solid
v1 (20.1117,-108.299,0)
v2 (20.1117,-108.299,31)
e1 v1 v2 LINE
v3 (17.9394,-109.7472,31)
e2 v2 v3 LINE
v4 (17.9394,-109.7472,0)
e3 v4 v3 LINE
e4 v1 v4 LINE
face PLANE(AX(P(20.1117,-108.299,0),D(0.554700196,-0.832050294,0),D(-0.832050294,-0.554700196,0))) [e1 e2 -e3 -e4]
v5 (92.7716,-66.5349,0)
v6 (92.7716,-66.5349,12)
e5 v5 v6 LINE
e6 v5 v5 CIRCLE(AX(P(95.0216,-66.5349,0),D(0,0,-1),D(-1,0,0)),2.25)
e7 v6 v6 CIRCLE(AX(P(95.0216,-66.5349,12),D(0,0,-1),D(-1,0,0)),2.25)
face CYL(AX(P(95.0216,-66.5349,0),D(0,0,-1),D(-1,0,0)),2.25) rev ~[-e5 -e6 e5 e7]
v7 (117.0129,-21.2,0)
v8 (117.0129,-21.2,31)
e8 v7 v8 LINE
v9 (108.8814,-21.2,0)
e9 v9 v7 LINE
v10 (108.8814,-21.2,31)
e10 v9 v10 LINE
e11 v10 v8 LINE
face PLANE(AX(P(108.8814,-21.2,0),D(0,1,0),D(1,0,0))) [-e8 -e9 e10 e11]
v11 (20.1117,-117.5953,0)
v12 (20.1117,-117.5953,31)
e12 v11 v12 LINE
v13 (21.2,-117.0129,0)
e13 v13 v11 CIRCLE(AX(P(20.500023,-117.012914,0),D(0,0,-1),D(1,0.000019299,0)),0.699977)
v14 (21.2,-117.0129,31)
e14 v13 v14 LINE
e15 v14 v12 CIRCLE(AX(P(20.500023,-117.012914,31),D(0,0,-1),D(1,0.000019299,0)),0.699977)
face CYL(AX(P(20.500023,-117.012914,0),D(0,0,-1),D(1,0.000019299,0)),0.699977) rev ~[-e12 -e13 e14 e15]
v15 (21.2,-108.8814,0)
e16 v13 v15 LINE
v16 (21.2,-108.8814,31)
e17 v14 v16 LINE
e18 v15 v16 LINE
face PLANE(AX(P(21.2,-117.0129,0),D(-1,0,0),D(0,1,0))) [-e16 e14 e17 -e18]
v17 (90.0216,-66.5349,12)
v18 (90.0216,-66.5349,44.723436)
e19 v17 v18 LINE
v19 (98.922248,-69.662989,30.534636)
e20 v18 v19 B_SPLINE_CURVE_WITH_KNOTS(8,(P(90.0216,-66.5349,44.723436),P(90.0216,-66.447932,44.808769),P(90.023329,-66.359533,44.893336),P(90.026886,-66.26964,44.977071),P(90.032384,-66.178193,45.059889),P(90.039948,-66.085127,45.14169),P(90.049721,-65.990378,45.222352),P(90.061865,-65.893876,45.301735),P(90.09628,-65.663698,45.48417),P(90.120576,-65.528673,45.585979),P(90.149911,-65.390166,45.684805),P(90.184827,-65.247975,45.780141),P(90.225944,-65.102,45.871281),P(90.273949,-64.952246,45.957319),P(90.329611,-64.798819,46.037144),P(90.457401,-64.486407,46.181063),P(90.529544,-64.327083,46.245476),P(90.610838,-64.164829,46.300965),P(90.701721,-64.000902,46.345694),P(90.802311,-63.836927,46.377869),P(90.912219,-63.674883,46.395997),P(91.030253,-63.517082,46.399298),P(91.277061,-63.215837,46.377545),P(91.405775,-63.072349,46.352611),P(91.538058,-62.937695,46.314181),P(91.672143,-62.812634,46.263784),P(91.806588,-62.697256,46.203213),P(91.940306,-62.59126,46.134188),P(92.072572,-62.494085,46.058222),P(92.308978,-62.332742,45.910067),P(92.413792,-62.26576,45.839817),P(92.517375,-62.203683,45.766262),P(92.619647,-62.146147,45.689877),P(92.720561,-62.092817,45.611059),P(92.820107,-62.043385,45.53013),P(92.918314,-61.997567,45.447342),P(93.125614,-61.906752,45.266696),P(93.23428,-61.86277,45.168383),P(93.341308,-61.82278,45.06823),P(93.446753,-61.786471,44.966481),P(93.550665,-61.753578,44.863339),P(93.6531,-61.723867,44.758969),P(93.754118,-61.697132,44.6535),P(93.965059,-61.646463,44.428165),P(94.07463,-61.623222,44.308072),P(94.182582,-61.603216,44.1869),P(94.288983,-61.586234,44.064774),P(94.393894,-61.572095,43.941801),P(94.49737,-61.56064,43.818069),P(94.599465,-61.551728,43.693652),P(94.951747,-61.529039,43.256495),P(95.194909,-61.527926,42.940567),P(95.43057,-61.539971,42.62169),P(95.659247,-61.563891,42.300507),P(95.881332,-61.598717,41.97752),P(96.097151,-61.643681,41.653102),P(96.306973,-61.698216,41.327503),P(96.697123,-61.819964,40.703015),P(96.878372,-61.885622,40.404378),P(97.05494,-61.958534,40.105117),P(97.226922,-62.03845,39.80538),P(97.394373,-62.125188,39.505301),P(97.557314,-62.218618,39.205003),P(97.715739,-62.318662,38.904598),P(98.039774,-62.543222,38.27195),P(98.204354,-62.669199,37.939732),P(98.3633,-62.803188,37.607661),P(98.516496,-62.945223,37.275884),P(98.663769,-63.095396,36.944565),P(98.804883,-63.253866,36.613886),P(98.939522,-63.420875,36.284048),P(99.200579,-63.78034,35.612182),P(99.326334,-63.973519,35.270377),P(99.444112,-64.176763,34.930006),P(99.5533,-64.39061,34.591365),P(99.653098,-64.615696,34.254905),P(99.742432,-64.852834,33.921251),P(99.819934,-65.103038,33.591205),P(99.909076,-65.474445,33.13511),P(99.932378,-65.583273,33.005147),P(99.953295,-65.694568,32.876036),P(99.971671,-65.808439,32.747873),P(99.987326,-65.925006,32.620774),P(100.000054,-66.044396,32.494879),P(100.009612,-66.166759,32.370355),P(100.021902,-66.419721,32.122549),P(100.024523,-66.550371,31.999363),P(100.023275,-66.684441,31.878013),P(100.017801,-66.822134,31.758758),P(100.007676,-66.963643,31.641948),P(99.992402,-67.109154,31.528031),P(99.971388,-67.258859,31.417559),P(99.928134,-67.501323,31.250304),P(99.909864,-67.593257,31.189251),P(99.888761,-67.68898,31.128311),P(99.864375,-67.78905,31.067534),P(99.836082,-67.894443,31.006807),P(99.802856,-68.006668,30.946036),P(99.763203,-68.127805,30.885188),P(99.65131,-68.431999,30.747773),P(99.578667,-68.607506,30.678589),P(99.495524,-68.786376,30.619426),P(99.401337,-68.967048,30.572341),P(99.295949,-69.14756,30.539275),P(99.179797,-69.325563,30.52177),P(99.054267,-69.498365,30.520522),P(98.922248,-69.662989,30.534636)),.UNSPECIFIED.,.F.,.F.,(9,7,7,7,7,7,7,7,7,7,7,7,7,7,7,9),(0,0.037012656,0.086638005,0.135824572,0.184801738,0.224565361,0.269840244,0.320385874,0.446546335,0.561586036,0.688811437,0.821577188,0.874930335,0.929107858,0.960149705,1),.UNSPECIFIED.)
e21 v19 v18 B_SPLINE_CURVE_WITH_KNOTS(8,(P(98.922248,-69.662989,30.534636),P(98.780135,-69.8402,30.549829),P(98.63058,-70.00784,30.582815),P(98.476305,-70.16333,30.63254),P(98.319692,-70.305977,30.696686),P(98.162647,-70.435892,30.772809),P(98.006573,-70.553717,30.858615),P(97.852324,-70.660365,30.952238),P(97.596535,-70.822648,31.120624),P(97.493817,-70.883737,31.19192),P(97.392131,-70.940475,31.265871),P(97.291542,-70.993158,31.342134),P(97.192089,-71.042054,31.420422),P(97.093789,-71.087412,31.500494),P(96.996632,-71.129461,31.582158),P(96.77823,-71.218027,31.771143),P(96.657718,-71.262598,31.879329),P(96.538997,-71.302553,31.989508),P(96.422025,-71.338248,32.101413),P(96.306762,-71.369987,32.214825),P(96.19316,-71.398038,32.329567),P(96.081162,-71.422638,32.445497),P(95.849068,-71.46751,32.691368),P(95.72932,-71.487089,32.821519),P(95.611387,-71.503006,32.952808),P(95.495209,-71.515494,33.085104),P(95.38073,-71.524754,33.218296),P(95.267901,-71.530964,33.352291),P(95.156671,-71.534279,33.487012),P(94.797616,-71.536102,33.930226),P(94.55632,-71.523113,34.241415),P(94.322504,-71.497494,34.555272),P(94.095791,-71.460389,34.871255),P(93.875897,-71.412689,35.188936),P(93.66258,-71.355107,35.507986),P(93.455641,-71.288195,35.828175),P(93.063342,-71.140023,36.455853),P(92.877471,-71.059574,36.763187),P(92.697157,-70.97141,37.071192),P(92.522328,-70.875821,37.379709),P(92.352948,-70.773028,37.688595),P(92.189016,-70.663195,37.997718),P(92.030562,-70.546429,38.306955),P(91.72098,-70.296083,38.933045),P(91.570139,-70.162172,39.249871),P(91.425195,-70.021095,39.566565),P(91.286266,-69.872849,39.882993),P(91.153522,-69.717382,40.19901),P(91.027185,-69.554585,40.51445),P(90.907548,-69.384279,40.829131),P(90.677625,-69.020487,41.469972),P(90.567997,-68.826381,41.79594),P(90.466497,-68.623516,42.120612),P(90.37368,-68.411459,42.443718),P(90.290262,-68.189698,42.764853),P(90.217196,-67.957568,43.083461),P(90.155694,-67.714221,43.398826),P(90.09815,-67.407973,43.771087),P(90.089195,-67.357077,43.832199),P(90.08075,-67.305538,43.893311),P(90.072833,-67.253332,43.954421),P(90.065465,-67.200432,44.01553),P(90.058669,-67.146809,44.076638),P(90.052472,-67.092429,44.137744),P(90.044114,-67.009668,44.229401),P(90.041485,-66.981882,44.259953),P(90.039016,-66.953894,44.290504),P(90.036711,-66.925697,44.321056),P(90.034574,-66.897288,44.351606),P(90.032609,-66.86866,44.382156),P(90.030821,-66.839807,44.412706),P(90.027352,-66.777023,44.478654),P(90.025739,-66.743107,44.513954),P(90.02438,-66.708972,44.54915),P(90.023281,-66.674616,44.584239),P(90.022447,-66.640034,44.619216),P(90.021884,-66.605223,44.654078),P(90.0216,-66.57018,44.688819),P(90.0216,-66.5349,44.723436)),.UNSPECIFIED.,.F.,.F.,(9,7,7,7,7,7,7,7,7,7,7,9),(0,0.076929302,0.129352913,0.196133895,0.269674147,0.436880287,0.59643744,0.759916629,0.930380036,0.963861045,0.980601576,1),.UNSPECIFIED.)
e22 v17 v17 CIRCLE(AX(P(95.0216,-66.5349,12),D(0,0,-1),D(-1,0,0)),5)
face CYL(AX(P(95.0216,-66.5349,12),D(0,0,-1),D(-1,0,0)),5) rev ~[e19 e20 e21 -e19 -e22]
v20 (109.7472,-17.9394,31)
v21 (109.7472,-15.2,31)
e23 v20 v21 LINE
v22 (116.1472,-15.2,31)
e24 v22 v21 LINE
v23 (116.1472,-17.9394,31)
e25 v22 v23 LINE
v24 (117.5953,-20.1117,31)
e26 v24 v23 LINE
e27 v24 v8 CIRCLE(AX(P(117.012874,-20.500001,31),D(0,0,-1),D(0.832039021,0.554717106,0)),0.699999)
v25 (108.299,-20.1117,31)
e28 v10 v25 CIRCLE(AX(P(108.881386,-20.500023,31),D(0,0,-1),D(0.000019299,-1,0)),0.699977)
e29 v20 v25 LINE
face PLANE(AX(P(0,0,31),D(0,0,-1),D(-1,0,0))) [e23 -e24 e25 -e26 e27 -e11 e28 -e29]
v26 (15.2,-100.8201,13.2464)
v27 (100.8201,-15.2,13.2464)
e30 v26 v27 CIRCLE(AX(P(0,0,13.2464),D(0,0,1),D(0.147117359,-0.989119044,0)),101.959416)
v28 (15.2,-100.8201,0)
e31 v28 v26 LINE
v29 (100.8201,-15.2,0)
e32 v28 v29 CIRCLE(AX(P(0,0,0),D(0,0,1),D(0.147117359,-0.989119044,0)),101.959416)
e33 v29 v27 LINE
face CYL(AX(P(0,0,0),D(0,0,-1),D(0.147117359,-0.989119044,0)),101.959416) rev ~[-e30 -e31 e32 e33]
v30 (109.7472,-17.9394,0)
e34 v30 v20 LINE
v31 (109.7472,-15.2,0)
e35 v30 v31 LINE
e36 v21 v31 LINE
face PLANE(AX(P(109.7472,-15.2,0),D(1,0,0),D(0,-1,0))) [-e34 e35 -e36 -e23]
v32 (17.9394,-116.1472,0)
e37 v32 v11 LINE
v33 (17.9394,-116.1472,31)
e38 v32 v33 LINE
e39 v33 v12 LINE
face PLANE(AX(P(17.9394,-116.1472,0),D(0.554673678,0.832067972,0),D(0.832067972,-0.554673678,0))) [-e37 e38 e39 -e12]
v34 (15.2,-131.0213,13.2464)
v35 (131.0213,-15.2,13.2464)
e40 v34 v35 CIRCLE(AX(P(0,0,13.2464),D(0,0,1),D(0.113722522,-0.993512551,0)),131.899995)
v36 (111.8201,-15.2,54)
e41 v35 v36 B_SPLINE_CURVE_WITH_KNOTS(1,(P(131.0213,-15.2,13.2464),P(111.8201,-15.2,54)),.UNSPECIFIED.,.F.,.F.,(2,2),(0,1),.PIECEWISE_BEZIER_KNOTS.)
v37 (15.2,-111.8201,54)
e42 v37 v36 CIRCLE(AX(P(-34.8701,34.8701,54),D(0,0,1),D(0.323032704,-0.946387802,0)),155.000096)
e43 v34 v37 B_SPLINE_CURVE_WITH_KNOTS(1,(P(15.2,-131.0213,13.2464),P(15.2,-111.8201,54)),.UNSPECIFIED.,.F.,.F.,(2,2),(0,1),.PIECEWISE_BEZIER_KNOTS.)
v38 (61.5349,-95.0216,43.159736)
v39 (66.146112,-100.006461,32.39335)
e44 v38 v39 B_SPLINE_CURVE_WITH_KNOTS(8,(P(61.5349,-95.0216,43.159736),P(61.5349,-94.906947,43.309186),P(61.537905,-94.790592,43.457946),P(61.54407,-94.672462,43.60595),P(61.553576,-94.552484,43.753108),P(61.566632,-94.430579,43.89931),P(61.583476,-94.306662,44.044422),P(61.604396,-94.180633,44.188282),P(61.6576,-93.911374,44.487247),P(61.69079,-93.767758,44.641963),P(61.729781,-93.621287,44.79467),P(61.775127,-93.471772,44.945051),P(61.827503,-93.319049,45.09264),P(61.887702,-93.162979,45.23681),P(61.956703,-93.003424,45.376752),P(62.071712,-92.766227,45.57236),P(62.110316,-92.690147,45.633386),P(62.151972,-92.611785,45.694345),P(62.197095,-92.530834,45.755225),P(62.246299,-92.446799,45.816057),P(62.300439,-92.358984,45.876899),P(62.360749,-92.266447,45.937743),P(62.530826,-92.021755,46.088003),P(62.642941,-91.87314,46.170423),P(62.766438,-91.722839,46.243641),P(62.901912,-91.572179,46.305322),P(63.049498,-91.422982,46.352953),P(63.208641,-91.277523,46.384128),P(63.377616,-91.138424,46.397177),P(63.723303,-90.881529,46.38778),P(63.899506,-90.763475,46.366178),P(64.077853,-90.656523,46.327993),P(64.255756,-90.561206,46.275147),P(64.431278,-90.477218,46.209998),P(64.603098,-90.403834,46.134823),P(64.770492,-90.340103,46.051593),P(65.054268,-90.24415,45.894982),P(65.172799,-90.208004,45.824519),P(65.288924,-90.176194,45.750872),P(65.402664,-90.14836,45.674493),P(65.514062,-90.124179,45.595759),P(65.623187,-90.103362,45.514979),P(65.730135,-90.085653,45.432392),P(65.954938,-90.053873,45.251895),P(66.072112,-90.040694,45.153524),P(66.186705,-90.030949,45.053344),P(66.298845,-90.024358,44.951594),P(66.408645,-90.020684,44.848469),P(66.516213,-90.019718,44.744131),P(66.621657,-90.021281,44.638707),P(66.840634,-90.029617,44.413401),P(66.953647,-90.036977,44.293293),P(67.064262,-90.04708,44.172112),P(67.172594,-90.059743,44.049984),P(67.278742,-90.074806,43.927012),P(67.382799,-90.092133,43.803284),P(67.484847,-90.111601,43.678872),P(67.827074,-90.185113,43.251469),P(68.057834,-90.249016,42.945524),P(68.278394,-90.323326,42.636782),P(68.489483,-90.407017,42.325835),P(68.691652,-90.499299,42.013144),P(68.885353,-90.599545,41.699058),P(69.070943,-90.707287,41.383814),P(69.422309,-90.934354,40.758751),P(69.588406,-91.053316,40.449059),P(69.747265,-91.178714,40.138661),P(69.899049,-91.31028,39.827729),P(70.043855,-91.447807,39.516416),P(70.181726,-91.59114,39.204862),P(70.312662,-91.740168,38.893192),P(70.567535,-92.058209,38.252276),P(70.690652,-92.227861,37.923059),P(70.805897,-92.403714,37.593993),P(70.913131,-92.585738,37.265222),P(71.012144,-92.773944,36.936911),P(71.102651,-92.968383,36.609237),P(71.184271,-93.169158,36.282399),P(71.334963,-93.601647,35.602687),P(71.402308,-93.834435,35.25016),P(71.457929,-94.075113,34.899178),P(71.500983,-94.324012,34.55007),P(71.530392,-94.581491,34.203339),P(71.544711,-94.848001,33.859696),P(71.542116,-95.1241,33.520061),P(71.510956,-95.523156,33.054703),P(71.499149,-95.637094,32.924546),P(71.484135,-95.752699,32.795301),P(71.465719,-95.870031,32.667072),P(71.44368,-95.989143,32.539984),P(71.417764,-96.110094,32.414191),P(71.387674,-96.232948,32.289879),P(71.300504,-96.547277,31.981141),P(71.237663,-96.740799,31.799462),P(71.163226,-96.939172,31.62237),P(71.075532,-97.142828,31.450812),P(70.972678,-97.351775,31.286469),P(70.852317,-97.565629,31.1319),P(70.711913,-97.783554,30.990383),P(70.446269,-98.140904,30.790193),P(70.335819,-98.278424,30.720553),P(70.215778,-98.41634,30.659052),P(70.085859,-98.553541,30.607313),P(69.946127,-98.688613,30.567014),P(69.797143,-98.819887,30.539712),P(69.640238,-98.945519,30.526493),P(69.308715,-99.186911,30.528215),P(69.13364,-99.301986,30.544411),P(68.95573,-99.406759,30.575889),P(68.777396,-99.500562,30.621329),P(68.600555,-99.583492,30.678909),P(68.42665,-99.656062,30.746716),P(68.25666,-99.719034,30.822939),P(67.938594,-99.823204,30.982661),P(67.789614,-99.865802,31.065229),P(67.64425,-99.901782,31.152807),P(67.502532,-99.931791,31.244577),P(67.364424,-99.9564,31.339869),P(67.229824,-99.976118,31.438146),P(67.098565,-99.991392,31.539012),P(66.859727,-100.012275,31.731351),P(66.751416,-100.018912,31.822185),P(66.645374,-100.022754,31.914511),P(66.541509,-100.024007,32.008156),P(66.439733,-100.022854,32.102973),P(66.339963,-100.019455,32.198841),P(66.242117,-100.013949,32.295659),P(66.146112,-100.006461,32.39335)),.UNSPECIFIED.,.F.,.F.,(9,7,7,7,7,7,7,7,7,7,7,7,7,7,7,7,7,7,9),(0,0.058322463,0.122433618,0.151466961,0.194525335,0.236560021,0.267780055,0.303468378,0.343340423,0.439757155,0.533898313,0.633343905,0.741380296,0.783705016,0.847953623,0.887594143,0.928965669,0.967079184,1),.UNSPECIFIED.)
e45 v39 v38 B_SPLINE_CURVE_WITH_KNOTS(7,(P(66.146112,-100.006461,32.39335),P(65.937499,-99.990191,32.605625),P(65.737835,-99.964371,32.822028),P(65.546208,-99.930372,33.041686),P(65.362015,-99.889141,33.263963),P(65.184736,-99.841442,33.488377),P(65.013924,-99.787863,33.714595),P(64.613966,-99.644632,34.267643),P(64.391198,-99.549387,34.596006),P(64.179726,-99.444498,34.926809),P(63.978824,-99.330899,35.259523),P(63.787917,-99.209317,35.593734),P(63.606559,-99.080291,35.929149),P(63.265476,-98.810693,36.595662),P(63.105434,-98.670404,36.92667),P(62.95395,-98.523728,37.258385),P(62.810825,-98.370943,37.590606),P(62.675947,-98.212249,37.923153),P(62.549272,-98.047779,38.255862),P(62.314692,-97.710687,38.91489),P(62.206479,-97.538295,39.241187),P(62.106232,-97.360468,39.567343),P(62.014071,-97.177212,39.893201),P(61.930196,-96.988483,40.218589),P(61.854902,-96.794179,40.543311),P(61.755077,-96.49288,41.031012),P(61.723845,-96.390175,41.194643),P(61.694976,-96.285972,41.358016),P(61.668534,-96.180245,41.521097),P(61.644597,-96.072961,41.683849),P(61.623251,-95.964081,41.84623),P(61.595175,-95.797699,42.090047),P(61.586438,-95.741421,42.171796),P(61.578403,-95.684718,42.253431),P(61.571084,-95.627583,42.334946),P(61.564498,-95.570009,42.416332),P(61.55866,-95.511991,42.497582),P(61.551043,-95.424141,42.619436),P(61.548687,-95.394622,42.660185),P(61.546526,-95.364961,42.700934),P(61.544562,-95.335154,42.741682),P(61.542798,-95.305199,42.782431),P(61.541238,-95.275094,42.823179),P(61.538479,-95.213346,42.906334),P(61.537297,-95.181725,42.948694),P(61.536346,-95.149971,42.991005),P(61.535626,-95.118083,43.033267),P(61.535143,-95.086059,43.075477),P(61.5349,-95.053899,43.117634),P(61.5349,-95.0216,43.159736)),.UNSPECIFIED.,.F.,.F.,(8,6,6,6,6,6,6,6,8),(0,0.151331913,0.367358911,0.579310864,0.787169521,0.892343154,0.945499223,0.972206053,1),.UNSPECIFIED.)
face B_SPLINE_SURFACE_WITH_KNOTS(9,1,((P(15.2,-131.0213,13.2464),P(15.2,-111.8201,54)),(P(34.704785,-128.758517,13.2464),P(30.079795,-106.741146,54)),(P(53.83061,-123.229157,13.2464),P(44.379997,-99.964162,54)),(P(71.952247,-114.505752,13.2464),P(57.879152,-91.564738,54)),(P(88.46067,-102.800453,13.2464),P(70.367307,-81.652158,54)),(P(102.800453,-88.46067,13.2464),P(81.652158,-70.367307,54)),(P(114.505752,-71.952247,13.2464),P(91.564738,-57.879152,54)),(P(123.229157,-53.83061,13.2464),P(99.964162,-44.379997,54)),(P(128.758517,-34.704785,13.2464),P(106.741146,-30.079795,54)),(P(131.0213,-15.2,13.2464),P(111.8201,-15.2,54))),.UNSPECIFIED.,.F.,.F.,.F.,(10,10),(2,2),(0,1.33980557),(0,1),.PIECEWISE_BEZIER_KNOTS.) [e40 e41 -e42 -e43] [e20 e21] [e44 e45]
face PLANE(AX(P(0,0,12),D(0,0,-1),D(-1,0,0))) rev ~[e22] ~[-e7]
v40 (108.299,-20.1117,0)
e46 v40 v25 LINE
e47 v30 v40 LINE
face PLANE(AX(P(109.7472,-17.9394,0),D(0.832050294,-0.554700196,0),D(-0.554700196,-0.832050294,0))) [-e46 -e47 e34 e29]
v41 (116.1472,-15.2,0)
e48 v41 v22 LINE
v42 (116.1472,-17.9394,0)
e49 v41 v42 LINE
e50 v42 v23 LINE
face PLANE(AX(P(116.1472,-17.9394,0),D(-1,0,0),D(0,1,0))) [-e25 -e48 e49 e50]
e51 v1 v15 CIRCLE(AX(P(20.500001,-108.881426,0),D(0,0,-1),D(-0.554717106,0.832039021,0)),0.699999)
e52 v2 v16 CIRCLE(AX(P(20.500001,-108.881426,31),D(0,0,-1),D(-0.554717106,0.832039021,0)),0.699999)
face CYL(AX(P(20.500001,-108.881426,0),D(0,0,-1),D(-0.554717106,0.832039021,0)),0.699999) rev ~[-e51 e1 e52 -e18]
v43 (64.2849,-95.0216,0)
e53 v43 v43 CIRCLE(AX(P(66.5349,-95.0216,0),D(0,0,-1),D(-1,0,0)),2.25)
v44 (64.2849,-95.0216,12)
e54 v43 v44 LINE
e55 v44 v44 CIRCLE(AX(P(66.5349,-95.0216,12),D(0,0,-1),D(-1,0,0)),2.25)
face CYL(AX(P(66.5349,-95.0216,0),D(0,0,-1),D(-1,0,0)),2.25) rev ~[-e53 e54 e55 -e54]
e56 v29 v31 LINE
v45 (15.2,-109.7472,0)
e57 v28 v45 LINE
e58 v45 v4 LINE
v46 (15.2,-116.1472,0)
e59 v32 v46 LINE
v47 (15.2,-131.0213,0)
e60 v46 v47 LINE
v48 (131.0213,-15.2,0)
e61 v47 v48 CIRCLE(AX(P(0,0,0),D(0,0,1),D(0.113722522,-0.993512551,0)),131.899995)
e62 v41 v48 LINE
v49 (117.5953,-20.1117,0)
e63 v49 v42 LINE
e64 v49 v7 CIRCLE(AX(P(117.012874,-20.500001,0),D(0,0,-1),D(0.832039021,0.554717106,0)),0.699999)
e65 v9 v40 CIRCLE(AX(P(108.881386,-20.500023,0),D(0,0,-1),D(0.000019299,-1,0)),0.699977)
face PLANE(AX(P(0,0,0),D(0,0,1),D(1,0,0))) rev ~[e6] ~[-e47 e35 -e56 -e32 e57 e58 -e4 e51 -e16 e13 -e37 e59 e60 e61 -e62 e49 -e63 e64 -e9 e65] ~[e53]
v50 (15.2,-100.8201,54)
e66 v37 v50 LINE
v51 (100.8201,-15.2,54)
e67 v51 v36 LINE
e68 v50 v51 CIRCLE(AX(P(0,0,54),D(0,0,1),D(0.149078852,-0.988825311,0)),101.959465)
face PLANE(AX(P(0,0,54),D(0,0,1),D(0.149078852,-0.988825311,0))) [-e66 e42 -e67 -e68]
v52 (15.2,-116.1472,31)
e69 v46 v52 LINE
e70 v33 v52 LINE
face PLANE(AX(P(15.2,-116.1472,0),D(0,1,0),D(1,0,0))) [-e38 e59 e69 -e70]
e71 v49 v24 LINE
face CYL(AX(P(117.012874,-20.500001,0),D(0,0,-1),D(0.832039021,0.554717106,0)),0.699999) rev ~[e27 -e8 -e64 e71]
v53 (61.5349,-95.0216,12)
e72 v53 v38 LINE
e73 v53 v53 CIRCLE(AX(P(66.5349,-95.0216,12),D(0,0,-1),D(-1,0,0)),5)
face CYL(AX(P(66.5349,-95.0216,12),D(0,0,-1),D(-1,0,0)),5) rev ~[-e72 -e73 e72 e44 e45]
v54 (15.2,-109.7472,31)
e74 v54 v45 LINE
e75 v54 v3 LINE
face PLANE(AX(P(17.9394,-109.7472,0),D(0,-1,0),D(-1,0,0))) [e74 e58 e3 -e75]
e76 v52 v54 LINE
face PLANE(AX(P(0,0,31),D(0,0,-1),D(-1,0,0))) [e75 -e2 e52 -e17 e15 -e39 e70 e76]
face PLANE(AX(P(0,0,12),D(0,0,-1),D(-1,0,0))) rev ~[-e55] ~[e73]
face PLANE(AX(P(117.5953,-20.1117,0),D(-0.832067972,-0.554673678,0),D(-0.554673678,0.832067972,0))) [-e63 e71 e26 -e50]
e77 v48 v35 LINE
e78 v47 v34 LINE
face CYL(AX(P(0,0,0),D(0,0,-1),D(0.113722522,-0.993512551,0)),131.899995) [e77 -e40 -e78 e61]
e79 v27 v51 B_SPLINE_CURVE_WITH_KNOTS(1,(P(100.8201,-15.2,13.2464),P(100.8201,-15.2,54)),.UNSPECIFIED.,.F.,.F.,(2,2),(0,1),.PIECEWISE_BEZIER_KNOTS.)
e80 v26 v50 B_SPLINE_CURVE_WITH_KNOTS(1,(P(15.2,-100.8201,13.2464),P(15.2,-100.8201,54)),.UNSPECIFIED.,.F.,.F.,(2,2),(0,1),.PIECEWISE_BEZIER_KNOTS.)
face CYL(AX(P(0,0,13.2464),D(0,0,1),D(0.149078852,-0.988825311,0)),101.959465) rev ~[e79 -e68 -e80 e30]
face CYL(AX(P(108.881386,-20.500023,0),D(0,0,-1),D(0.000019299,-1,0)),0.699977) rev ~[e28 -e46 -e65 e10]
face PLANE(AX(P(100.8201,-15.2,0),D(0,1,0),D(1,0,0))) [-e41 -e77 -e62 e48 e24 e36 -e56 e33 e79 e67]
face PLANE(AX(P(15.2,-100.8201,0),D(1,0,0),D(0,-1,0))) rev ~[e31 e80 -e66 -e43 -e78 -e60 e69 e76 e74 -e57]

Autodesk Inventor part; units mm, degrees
ref_plane "YZ Plane" through (0, 0, 0) normal (1, 0, 0) x (0, 1, 0)
ref_plane "Płaszczyzna konstrukcyjna1" through (0, 0, 0) normal (0, 0, 1) x (1, 0, 0)
sketch "Szkic1" plane through (0, 0, 0) normal (0, 0, 1) x (1, 0, 0)
  arc A0 (15, -100.85) -> (100.85, -15) centre (0, 0) ccw projected
  arc A1 (15, -131.0443) -> (131.0443, -15) centre (0, 0) ccw projected
  line L0 (100.85, -15) -> (111.85, -15) projected
  line L1 (15, -100.85) -> (15, -111.85) projected
  line L2 (15.2, -100.8201) -> (15.2, -131.0213)
  line L3 (100.8201, -15.2) -> (131.0213, -15.2)
  point P0 (0, 0)
  dimension "d0" = 0.2
  dimension "d1" = 0.2
extrude "Wyciągnięcie proste1" add sketch "Szkic1" along normal up to surface (13.2464 mm away)
sketch "Szkic2" plane through (100.8201, -15.2, 13.2464) normal (0, 0, 1) x (1, 0, 0)
  line L0 (0, 0) -> (30.2012, 0) projected
  arc A0 (-85.6201, -85.6201) -> (0, 0) centre (-100.8201, 15.2) ccw projected
  line L1 (-85.6201, -115.8213) -> (-85.6201, -85.6201) projected
  arc A1 (-85.6201, -115.8213) -> (30.2012, 0) centre (-100.8201, 15.2) ccw projected
ref_plane "Płaszczyzna konstrukcyjna2" through (15, -111.85, 54) normal (0, 0, 1) x (1, 0, 0)
sketch "Szkic3" plane through (15, -111.85, 54) normal (0, 0, 1) x (1, 0, 0)
  arc A0 (0.2, 11.0299) -> (85.8201, 96.65) centre (-15, 111.85) ccw projected
  line L0 (0.2, -19.1713) -> (0.2, 11.0299) projected
  line L1 (85.8201, 96.65) -> (116.0213, 96.65) projected
  line L2 (0.2, 11.0299) -> (0.2, 0.0299)
  line L3 (0.2, -19.1713) -> (0.2, 11.0299) projected
  line L4 (85.8201, 96.65) -> (116.0213, 96.65) projected
  line L5 (85.8201, 96.65) -> (96.8201, 96.65)
  arc A1 (0.2, 0.0299) -> (96.8201, 96.65) centre (-49.8701, 146.7201) ccw
  point P0 (-15, 111.85)
  dimension "d4" = 11
  dimension "d5" = 11
  dimension "d6" = 155
loft "Wyciągnięcie złożone1" add profiles "Szkic2", "Szkic3"
sketch "Szkic7" plane through (0, 0, 0) normal (0, 0, -1) x (-1, 0, 0)
  line L0 (-109.9472, -18) -> (-109.9472, -15) projected
  line L1 (-108.4654, -20.2226) -> (-109.9472, -18) projected
  line L2 (-115.9472, -15) -> (-115.9472, -18) projected
  line L3 (-115.9472, -18) -> (-117.4289, -20.2226) projected
  arc A0 (-117.4289, -20.2226) -> (-117.0129, -21) centre (-117.0129, -20.5) ccw projected
  line L4 (-117.0129, -21) -> (-108.8814, -21) projected
  arc A1 (-108.8814, -21) -> (-108.4654, -20.2226) centre (-108.8814, -20.5) ccw projected
  line L5 (-100.8201, -15.2) -> (-131.0213, -15.2) projected
  line L6 (-18, -115.9472) -> (-15, -115.9472) projected
  line L7 (-20.2226, -117.4289) -> (-18, -115.9472) projected
  arc A2 (-21, -117.0129) -> (-20.2226, -117.4289) centre (-20.5, -117.0129) ccw projected
  line L8 (-21, -108.8814) -> (-21, -117.0129) projected
  arc A3 (-20.2226, -108.4654) -> (-21, -108.8814) centre (-20.5, -108.8814) ccw projected
  line L9 (-18, -109.9472) -> (-20.2226, -108.4654) projected
  line L10 (-15, -109.9472) -> (-18, -109.9472) projected
  line L11 (-15.2, -131.0213) -> (-15.2, -100.8201) projected
  line L12 (-15, -116.1472) -> (-17.9394, -116.1472)
  line L13 (-17.9394, -116.1472) -> (-20.1117, -117.5953)
  arc A4 (-21.2, -117.0129) -> (-20.1117, -117.5953) centre (-20.5, -117.0129) ccw
  line L14 (-21.2, -117.0129) -> (-21.2, -108.8814)
  arc A5 (-20.1117, -108.299) -> (-21.2, -108.8814) centre (-20.5, -108.8814) ccw
  line L15 (-20.1117, -108.299) -> (-17.9394, -109.7472)
  line L16 (-17.9394, -109.7472) -> (-15, -109.7472)
  line L17 (-109.7472, -15) -> (-109.7472, -17.9394)
  line L18 (-109.7472, -17.9394) -> (-108.299, -20.1117)
  arc A6 (-108.8814, -21.2) -> (-108.299, -20.1117) centre (-108.8814, -20.5) ccw
  line L19 (-108.8814, -21.2) -> (-117.0129, -21.2)
  arc A7 (-117.5953, -20.1117) -> (-117.0129, -21.2) centre (-117.0129, -20.5) ccw
  line L20 (-117.5953, -20.1117) -> (-116.1472, -17.9394)
  line L21 (-116.1472, -17.9394) -> (-116.1472, -15)
  line L22 (-116.1472, -15) -> (-109.7472, -15)
  line L23 (-15, -116.1472) -> (-15, -109.7472)
  point P0 (0, 0)
  dimension "d40" = 0.2
  dimension "d41" = 0.2
  dimension "d42" = 0.2
extrude "Wyciągnięcie proste6" cut sketch "Szkic7" against normal blind 31
sketch "Szkic5" plane through (0, 0, 0) normal (0, 0, -1) x (-1, 0, 0)
  circle A0 centre (-95.0216, -66.5349) radius 2.25 projected
  circle A1 centre (-66.5349, -95.0216) radius 2.25 projected
  point P0 (0, 0)
extrude "Wyciągnięcie proste4" cut sketch "Szkic5" against normal through all
ref_plane "Płaszczyzna konstrukcyjna3" through (0, 0, 12) normal (0, 0, -1) x (-1, 0, 0)
sketch "Szkic6" plane through (0, 0, 12) normal (0, 0, -1) x (-1, 0, 0)
  spline S0 degree 2 poles (-64.2849, -95.0216) (-64.2849, -91.1245) (-67.6599, -93.0731) (-71.0349, -95.0216) (-67.6599, -96.9702) (-64.2849, -98.9188) (-64.2849, -95.0216) knots 0 0 0 0.333333 0.333333 0.666667 0.666667 1 1 1 weights 1 0.5 1 0.5 1 0.5 1 projected
  spline S1 degree 2 poles (-92.7716, -66.5349) (-92.7716, -62.6378) (-96.1466, -64.5863) (-99.5216, -66.5349) (-96.1466, -68.4834) (-92.7716, -70.432) (-92.7716, -66.5349) knots 0 0 0 0.333333 0.333333 0.666667 0.666667 1 1 1 weights 1 0.5 1 0.5 1 0.5 1 projected
  circle A0 centre (-95.0216, -66.5349) radius 2.25 projected
  circle A1 centre (-95.0216, -66.5349) radius 5
  circle A2 centre (-66.5349, -95.0216) radius 2.25 projected
  circle A3 centre (-66.5349, -95.0216) radius 5
  point P0 (0, 0)
  dimension "d22" = 10
  dimension "d23" = 10
extrude "Wyciągnięcie proste5" cut sketch "Szkic6" against normal through all contours S0 | S1 | A1 | A3
equation "\"d1\" = d0"
properties part number "connectro_best"
